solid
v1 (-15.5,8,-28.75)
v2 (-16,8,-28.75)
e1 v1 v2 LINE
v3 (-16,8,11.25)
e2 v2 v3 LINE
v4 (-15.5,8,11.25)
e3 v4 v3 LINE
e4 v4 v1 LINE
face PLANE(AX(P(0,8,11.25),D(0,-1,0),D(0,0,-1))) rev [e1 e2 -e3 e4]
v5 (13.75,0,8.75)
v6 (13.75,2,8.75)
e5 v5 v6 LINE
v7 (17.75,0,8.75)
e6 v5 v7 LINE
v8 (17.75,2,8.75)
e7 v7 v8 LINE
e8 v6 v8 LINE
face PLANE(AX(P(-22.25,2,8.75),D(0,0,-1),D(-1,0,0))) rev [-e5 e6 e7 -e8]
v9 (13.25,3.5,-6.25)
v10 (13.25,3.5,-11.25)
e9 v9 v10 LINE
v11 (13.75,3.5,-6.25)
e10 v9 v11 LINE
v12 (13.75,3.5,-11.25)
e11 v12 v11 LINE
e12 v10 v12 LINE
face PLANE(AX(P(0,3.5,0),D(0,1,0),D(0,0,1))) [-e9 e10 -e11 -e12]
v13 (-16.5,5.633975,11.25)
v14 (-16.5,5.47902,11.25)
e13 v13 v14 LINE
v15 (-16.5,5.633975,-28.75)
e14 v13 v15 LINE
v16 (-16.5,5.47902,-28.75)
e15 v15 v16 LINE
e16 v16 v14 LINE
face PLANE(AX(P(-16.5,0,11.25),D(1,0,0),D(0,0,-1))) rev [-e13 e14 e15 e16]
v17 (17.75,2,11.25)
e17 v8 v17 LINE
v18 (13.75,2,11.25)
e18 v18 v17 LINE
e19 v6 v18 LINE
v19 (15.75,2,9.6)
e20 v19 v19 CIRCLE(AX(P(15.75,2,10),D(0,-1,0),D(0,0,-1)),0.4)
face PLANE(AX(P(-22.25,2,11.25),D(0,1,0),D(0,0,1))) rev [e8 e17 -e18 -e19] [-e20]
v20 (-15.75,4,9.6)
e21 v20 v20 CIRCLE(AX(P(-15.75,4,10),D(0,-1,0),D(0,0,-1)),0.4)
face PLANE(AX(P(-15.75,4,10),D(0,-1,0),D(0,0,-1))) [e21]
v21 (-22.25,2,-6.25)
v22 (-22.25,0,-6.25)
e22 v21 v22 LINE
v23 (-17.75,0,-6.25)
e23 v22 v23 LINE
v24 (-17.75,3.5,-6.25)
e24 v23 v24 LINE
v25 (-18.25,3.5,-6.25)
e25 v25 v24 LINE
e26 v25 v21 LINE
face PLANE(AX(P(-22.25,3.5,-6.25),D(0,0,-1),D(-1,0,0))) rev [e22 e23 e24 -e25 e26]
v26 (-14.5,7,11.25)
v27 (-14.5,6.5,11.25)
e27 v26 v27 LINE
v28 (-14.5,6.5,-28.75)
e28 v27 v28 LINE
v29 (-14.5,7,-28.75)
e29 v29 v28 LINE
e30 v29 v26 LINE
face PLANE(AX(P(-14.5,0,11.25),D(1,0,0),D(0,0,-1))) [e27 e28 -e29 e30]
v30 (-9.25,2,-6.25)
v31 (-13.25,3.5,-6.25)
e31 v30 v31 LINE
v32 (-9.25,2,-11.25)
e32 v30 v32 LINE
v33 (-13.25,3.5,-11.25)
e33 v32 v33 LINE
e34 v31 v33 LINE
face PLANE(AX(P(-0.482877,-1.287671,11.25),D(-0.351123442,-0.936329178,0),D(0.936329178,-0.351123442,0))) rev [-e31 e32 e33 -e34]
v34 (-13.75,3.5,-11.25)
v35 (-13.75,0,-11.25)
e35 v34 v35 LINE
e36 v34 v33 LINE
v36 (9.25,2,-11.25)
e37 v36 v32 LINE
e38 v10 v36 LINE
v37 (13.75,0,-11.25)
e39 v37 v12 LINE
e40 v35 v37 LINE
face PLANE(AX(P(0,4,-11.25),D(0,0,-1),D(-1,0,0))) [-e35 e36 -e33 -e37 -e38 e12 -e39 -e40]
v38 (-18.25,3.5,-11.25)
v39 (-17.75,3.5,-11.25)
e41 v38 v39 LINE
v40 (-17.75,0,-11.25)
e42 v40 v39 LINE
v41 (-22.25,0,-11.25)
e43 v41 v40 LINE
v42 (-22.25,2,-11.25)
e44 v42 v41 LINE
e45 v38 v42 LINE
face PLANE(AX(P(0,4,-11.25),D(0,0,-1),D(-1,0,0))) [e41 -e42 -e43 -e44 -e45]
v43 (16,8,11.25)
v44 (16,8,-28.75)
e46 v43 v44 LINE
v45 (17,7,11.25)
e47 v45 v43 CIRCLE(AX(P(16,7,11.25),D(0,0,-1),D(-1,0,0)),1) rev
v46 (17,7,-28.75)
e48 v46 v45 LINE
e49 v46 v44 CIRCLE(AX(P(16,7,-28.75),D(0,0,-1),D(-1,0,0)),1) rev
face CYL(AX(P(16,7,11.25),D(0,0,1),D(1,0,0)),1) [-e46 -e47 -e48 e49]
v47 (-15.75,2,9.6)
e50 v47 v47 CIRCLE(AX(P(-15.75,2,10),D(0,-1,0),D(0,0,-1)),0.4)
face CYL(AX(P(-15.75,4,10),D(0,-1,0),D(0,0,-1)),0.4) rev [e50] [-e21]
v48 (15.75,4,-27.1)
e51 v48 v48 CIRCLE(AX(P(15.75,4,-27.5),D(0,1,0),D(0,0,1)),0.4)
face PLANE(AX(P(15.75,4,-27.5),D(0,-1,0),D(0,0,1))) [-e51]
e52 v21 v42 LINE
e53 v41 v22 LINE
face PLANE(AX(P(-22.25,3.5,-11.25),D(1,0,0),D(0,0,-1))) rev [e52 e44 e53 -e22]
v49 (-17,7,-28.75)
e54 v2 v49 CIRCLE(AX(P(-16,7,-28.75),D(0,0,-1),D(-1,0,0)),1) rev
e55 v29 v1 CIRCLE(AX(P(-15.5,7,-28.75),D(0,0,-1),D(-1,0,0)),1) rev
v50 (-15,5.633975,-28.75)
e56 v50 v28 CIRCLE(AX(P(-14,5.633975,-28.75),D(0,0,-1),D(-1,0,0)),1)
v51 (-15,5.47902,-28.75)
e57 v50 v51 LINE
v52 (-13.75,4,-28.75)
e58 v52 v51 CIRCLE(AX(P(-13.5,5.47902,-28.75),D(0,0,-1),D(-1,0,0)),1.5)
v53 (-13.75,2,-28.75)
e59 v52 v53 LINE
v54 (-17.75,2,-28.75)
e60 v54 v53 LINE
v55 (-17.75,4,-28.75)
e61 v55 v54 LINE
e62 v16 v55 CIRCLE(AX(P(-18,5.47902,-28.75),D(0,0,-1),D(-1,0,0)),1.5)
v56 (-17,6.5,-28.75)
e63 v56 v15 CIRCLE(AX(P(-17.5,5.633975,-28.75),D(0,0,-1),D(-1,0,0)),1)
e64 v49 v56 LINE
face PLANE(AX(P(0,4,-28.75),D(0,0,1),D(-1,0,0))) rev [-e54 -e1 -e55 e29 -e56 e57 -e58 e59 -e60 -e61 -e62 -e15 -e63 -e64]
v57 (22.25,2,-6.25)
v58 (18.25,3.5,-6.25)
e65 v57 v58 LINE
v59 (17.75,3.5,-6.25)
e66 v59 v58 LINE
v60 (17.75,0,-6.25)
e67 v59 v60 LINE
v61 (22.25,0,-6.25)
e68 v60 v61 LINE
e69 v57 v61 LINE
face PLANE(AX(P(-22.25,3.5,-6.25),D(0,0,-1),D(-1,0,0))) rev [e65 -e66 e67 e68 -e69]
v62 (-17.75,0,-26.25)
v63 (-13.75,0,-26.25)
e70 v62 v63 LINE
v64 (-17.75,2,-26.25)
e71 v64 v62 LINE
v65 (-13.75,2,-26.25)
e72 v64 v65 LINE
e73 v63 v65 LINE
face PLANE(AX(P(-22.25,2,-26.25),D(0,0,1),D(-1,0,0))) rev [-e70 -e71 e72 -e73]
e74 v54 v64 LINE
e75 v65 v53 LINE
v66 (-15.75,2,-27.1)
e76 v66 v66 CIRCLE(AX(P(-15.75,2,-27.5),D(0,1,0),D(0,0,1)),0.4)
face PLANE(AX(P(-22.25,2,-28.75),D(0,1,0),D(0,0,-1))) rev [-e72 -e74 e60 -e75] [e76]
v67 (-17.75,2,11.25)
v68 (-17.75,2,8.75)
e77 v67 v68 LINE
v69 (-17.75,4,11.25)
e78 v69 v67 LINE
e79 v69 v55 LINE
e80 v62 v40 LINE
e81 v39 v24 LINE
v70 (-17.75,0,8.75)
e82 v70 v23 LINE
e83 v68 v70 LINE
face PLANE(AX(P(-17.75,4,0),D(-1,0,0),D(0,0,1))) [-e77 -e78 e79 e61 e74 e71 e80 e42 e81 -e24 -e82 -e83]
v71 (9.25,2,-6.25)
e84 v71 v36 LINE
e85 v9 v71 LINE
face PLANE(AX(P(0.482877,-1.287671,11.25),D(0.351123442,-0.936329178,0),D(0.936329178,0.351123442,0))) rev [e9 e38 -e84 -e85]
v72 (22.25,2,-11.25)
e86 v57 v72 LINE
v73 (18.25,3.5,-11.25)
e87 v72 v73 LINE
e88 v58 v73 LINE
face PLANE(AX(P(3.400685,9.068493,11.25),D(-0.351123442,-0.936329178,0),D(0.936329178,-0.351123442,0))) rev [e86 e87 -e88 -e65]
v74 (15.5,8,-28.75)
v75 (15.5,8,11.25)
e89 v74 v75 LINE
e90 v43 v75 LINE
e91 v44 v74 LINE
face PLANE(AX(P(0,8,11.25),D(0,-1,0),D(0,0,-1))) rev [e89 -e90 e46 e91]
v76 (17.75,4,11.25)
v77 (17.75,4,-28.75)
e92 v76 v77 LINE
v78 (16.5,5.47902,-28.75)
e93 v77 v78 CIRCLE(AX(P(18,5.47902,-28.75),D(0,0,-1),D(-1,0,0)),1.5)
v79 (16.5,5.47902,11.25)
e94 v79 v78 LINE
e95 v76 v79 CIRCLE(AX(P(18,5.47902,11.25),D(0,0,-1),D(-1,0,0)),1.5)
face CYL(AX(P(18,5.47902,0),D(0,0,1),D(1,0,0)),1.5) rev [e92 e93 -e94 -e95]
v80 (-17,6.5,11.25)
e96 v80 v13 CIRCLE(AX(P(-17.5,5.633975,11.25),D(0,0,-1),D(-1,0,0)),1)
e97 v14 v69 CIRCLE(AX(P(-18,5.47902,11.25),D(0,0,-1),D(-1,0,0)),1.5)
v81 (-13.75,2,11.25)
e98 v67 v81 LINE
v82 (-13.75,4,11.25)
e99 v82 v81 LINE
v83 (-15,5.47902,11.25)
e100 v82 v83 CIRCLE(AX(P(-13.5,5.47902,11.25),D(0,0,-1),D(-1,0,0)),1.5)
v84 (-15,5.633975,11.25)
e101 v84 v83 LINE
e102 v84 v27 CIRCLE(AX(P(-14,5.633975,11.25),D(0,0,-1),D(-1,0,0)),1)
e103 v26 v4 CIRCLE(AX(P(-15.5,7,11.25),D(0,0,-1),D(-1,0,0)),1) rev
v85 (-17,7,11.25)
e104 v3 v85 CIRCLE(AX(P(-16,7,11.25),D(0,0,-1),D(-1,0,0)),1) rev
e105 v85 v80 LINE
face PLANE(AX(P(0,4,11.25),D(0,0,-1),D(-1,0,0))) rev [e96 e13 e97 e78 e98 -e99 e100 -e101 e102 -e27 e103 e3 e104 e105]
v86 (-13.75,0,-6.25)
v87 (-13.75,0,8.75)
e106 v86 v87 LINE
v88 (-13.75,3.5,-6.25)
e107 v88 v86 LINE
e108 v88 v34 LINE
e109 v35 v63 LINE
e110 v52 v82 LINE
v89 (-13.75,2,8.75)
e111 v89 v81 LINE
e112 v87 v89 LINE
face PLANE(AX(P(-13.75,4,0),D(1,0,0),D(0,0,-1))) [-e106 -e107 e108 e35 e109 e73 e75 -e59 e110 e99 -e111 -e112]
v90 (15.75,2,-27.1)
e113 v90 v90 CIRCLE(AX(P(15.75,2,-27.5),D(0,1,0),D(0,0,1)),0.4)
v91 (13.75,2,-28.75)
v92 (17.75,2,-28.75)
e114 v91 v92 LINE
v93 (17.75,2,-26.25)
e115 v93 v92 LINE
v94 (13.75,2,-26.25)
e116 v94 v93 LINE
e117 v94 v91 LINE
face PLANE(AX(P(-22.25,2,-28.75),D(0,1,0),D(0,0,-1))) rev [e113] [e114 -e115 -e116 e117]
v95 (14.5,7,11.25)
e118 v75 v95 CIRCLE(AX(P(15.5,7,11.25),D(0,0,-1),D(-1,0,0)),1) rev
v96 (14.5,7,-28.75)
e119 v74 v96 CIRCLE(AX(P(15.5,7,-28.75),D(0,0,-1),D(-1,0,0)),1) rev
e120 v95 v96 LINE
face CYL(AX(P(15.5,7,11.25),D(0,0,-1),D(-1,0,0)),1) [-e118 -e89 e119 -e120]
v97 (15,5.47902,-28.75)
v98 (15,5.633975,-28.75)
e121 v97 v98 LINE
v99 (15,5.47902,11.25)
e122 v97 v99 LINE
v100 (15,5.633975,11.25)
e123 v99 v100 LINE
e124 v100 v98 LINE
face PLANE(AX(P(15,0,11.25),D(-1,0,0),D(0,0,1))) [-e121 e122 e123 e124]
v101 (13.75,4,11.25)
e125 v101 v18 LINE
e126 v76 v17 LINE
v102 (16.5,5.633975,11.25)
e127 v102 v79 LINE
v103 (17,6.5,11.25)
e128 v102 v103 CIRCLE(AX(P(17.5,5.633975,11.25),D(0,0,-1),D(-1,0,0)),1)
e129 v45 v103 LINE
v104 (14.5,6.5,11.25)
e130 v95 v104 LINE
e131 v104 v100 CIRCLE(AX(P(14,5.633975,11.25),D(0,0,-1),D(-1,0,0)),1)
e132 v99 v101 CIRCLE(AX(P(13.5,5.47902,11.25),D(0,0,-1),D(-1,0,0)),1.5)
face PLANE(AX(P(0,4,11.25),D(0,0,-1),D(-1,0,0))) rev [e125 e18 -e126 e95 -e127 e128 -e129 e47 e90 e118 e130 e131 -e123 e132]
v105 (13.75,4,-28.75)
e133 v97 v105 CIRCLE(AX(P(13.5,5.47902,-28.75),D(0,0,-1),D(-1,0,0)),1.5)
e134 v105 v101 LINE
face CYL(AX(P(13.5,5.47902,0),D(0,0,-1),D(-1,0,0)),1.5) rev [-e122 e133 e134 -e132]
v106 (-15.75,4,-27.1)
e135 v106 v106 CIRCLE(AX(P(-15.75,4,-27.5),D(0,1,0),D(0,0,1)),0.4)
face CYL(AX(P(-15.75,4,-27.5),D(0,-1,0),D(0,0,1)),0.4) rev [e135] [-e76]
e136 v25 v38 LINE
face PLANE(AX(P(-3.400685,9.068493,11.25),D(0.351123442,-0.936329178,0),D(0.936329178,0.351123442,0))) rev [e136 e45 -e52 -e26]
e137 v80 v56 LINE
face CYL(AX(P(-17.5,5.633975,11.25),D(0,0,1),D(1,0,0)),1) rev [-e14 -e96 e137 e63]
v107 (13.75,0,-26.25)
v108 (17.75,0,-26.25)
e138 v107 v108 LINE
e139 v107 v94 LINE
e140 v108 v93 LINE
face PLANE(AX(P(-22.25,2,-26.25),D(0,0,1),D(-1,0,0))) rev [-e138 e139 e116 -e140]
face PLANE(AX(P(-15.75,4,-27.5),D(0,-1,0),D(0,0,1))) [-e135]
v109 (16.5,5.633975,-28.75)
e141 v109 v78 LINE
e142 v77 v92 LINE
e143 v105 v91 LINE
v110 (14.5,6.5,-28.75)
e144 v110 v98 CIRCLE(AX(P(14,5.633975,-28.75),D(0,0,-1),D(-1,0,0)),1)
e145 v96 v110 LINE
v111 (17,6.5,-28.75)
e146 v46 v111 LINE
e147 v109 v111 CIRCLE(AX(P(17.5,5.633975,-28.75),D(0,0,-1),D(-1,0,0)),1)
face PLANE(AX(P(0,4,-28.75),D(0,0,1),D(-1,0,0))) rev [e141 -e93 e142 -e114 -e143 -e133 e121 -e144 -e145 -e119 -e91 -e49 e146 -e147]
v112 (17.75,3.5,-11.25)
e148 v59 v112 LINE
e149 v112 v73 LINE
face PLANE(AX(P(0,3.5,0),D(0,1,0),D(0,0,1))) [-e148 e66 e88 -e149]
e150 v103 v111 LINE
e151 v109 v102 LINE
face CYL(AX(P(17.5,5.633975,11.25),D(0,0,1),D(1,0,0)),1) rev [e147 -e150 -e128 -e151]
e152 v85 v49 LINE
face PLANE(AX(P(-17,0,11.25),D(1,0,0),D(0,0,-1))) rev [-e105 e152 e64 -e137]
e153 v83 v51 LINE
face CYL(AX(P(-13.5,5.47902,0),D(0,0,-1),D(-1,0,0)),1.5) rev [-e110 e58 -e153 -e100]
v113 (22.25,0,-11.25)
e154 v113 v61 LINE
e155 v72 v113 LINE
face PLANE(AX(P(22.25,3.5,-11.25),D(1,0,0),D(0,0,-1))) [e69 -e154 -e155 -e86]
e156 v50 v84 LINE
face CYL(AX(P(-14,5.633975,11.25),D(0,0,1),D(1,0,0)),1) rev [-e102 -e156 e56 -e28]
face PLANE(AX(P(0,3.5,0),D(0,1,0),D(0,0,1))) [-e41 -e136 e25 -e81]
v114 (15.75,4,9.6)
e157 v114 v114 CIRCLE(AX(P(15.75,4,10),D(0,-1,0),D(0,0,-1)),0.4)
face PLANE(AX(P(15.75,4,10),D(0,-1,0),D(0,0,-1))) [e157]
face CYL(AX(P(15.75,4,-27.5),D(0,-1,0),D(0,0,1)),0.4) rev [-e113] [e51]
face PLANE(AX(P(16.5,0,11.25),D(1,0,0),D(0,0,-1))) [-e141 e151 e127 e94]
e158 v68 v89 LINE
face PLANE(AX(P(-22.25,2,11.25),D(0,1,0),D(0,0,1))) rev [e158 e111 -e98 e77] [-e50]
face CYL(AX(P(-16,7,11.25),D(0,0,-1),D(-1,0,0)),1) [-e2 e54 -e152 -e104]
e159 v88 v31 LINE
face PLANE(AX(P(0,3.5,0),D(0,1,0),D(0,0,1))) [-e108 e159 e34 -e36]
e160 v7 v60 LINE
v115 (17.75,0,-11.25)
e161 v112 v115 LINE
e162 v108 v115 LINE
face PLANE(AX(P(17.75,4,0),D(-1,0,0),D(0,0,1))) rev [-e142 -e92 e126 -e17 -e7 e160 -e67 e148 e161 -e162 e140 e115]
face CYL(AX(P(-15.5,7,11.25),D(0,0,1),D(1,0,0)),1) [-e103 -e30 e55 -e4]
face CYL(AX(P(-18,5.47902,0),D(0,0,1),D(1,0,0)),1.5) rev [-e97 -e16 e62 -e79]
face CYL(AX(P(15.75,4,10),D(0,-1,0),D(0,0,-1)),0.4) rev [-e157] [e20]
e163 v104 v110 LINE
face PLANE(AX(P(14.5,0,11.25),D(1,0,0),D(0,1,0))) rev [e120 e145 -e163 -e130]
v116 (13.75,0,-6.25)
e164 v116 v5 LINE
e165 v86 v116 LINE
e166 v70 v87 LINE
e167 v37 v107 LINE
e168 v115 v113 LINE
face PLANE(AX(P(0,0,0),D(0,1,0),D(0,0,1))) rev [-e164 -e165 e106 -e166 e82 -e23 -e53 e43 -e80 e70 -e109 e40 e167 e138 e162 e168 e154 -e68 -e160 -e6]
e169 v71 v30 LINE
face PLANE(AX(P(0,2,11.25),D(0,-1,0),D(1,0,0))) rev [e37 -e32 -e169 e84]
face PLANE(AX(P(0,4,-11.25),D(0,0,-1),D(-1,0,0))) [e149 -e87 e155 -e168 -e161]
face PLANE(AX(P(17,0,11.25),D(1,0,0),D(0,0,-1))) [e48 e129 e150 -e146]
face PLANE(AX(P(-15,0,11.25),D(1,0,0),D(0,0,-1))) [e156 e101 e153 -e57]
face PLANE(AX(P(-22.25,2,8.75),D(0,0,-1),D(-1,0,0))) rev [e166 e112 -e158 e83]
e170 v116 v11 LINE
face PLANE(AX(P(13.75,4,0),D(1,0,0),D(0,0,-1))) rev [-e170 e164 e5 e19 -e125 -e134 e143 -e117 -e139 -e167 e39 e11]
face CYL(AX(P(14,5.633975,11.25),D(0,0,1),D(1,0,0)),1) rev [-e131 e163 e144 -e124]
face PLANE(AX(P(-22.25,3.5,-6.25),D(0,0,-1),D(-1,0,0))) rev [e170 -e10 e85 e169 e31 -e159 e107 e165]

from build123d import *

# Parameters (mm, degrees)
SKETCH_1_W          = 4
SKETCH_1_H          = 17.5
SKETCH_1_H_2        = 5
EXTRUDE_1_DEPTH     = 4
SKETCH_1_7_W        = 44.5
SKETCH_1_7_H        = 5
EXTRUDE_2_DEPTH     = 3.5
SKETCH_2_W          = 18.5
SKETCH_2_H          = 1.5
CUT_EXTRUDE_1_DEPTH = 32.89533665
SKETCH_2_3_W        = 2.5
SKETCH_2_3_H        = 1.5
EXTRUDE_4_DEPTH     = 22.5
FILLET_1_R          = 1
FILLET_2_R          = 1.5
FILLET_3_R          = 1
SKETCH_5_W          = 2.5
SKETCH_5_H          = 2
CUT_EXTRUDE_2_DEPTH = 43.315038698
SKETCH_10_R         = 0.4
CUT_EXTRUDE_3_DEPTH = 2


with BuildPart() as part:
    # 草图1 → 凸台-拉伸1 (new body)
    with BuildSketch(Plane(origin=(0, 0, 0), x_dir=(1, 0, 0), z_dir=(0, 1, 0))):
        with Locations((-15.75, -2.5)):
            Rectangle(SKETCH_1_W, SKETCH_1_H)
        with Locations((15.75, -2.5)):
            Rectangle(SKETCH_1_W, SKETCH_1_H)
        with Locations((15.75, 8.75)):
            Rectangle(SKETCH_1_W, SKETCH_1_H_2)
        with Locations((-15.75, 8.75)):
            Rectangle(SKETCH_1_W, SKETCH_1_H_2)
    extrude(amount=EXTRUDE_1_DEPTH)

    # 草图1<7> → 凸台-拉伸2 (add)
    with BuildSketch(Plane(origin=(0, 0, 0), x_dir=(1, 0, 0), z_dir=(0, 1, 0))):
        with Locations((0, 8.75)):
            Rectangle(SKETCH_1_7_W, SKETCH_1_7_H)
    extrude(amount=EXTRUDE_2_DEPTH)

    # 草图2 → 切除-拉伸1 (cut, through all)
    with BuildSketch(Plane(origin=(0, 0, -11.25), x_dir=(-1, 0, 0), z_dir=(0, 0, -1))):
        with Locations((0, 2.75)):
            Rectangle(SKETCH_2_W, SKETCH_2_H)
        Polygon((13.25, 3.5), (9.25, 3.5), (9.25, 2), align=None)
        Polygon((-9.25, 3.5), (-13.25, 3.5), (-9.25, 2), align=None)
        Polygon((-22.25, 3.5), (-22.25, 2), (-18.25, 3.5), align=None)
        Polygon((22.25, 3.5), (18.25, 3.5), (22.25, 2), align=None)
    extrude(amount=-CUT_EXTRUDE_1_DEPTH, mode=Mode.SUBTRACT)

    # 草图2<3> → 凸台-拉伸4 (add, through all)
    with BuildSketch(Plane(origin=(0, 0, -11.25), x_dir=(-1, 0, 0), z_dir=(0, 0, -1))):
        with Locations((-15.75, 7.25)):
            Rectangle(SKETCH_2_3_W, SKETCH_2_3_H)
        Polygon((-15, 6.5), (-16.5, 6.5), (-16.5, 4), (-15.75, 4), (-15, 4), align=None)
        with Locations((15.75, 7.25)):
            Rectangle(SKETCH_2_3_W, SKETCH_2_3_H)
        Polygon((16.5, 6.5), (15, 6.5), (15, 4), (15.75, 4), (16.5, 4), align=None)
    extrude(amount=-EXTRUDE_4_DEPTH)

    # 圆角1
    # the kernel refuses this fillet: 1 mm, written as the material it adds along each edge
    with BuildSketch(Plane(origin=(-16.5, 6.5, -11.25), x_dir=(0, -1, 0), z_dir=(0, 0, 1))) as fillet_1_piece_1:
        with BuildLine():
            CenterArc((0.866025404, -1), FILLET_1_R, 90, 60)
            Line((0, -0.5), (-0.017320508, -0.49))
            ThreePointArc((-0.017320508, -0.49), (-0.02, -0.25), (-0.02, 0))
            Line((-0.02, 0), (0, 0.02))
            Line((0, 0.02), (0.866025404, 0.02))
            Line((0.866025404, 0.02), (0.866025404, 0))
        make_face()
    extrude(amount=22.5)
    with BuildSketch(Plane(origin=(-15, 6.5, -11.25), x_dir=(0, -1, 0), z_dir=(0, 0, 1)), Plane(origin=(16.5, 6.5, -11.25), x_dir=(0, -1, 0), z_dir=(0, 0, 1))) as fillet_1_piece_2:
        with BuildLine():
            CenterArc((0.866025404, 1), FILLET_1_R, 210, 60)
            Line((0, 0.5), (-0.017320508, 0.49))
            ThreePointArc((-0.017320508, 0.49), (-0.02, 0.25), (-0.02, 0))
            Line((-0.02, 0), (0, -0.02))
            Line((0, -0.02), (0.866025404, -0.02))
            Line((0.866025404, -0.02), (0.866025404, 0))
        make_face()
    extrude(amount=22.5)
    with BuildSketch(Plane(origin=(15, 6.5, -11.25), x_dir=(-1, 0, 0), z_dir=(0, 0, 1))) as fillet_1_piece_3:
        with BuildLine():
            CenterArc((1, 0.866025404), FILLET_1_R, 180, 60)
            Line((0, 0.866025404), (-0.02, 0.866025404))
            Line((-0.02, 0.866025404), (-0.02, 0))
            Line((-0.02, 0), (0, -0.02))
            ThreePointArc((0, -0.02), (0.25, -0.02), (0.49, -0.017320508))
            Line((0.49, -0.017320508), (0.5, 0))
        make_face()
    extrude(amount=22.5)

    # 圆角2
    # the kernel refuses this fillet: 1.5 mm, written as the material it adds along each edge
    with BuildSketch(Plane(origin=(16.5, 4, -11.25), x_dir=(1, 0, 0), z_dir=(0, 0, 1)), Plane(origin=(-15, 4, -11.25), x_dir=(1, 0, 0), z_dir=(0, 0, 1))) as fillet_2_piece_1:
        with BuildLine():
            CenterArc((1.5, 1.479019946), FILLET_2_R, 180, 80.405931773)
            Line((0, 1.479019946), (-0.03, 1.479019946))
            Line((-0.03, 1.479019946), (-0.03, 0))
            Line((-0.03, 0), (0, -0.03))
            ThreePointArc((0, -0.03), (0.625, -0.03), (1.245, -0.029580399))
            Line((1.245, -0.029580399), (1.25, 0))
        make_face()
    extrude(amount=22.5)
    with BuildSketch(Plane(origin=(15, 4, -11.25), x_dir=(0, 1, 0), z_dir=(0, 0, 1)), Plane(origin=(-16.5, 4, -11.25), x_dir=(0, 1, 0), z_dir=(0, 0, 1))) as fillet_2_piece_2:
        with BuildLine():
            CenterArc((1.479019946, 1.5), FILLET_2_R, 189.594068227, 80.405931773)
            Line((0, 1.25), (-0.029580399, 1.245))
            ThreePointArc((-0.029580399, 1.245), (-0.03, 0.625), (-0.03, 0))
            Line((-0.03, 0), (0, -0.03))
            Line((0, -0.03), (1.479019946, -0.03))
            Line((1.479019946, -0.03), (1.479019946, 0))
        make_face()
    extrude(amount=22.5)

    # 圆角3
    fillet_3_edges = [part.edges().sort_by_distance(p)[0] for p in [
        (14.5, 8, 0),
        (17, 8, 0),
        (-17, 8, 0),
        (-14.5, 8, 0),
    ]]
    fillet(fillet_3_edges, radius=FILLET_3_R)

    # 草图5 → 切除-拉伸2 (cut, through all)
    with BuildSketch(Plane(origin=(17.75, 0, 0), x_dir=(0, 0, -1), z_dir=(1, 0, 0))):
        with Locations((-10, 1)):
            Rectangle(SKETCH_5_W, SKETCH_5_H)
    extrude(amount=-CUT_EXTRUDE_2_DEPTH, mode=Mode.SUBTRACT)

    # 草图10 → 切除-拉伸3 (cut)
    with BuildSketch(Plane.XZ.offset(-2)):
        with Locations(Location((15.75, 10, 0), (0, 0, 270))):
            Circle(SKETCH_10_R)
        with Locations(Location((-15.75, 10, 0), (0, 0, 270))):
            Circle(SKETCH_10_R)
    extrude(amount=-CUT_EXTRUDE_3_DEPTH, mode=Mode.SUBTRACT)

    # 镜向1: part across plane


with BuildPart() as part_1:
    add(part.part)
    add(part.part.mirror(Plane(origin=(0, 0, -8.75), x_dir=(1, 0, 0), z_dir=(0, 0, -1))))


solid = part_1.part
